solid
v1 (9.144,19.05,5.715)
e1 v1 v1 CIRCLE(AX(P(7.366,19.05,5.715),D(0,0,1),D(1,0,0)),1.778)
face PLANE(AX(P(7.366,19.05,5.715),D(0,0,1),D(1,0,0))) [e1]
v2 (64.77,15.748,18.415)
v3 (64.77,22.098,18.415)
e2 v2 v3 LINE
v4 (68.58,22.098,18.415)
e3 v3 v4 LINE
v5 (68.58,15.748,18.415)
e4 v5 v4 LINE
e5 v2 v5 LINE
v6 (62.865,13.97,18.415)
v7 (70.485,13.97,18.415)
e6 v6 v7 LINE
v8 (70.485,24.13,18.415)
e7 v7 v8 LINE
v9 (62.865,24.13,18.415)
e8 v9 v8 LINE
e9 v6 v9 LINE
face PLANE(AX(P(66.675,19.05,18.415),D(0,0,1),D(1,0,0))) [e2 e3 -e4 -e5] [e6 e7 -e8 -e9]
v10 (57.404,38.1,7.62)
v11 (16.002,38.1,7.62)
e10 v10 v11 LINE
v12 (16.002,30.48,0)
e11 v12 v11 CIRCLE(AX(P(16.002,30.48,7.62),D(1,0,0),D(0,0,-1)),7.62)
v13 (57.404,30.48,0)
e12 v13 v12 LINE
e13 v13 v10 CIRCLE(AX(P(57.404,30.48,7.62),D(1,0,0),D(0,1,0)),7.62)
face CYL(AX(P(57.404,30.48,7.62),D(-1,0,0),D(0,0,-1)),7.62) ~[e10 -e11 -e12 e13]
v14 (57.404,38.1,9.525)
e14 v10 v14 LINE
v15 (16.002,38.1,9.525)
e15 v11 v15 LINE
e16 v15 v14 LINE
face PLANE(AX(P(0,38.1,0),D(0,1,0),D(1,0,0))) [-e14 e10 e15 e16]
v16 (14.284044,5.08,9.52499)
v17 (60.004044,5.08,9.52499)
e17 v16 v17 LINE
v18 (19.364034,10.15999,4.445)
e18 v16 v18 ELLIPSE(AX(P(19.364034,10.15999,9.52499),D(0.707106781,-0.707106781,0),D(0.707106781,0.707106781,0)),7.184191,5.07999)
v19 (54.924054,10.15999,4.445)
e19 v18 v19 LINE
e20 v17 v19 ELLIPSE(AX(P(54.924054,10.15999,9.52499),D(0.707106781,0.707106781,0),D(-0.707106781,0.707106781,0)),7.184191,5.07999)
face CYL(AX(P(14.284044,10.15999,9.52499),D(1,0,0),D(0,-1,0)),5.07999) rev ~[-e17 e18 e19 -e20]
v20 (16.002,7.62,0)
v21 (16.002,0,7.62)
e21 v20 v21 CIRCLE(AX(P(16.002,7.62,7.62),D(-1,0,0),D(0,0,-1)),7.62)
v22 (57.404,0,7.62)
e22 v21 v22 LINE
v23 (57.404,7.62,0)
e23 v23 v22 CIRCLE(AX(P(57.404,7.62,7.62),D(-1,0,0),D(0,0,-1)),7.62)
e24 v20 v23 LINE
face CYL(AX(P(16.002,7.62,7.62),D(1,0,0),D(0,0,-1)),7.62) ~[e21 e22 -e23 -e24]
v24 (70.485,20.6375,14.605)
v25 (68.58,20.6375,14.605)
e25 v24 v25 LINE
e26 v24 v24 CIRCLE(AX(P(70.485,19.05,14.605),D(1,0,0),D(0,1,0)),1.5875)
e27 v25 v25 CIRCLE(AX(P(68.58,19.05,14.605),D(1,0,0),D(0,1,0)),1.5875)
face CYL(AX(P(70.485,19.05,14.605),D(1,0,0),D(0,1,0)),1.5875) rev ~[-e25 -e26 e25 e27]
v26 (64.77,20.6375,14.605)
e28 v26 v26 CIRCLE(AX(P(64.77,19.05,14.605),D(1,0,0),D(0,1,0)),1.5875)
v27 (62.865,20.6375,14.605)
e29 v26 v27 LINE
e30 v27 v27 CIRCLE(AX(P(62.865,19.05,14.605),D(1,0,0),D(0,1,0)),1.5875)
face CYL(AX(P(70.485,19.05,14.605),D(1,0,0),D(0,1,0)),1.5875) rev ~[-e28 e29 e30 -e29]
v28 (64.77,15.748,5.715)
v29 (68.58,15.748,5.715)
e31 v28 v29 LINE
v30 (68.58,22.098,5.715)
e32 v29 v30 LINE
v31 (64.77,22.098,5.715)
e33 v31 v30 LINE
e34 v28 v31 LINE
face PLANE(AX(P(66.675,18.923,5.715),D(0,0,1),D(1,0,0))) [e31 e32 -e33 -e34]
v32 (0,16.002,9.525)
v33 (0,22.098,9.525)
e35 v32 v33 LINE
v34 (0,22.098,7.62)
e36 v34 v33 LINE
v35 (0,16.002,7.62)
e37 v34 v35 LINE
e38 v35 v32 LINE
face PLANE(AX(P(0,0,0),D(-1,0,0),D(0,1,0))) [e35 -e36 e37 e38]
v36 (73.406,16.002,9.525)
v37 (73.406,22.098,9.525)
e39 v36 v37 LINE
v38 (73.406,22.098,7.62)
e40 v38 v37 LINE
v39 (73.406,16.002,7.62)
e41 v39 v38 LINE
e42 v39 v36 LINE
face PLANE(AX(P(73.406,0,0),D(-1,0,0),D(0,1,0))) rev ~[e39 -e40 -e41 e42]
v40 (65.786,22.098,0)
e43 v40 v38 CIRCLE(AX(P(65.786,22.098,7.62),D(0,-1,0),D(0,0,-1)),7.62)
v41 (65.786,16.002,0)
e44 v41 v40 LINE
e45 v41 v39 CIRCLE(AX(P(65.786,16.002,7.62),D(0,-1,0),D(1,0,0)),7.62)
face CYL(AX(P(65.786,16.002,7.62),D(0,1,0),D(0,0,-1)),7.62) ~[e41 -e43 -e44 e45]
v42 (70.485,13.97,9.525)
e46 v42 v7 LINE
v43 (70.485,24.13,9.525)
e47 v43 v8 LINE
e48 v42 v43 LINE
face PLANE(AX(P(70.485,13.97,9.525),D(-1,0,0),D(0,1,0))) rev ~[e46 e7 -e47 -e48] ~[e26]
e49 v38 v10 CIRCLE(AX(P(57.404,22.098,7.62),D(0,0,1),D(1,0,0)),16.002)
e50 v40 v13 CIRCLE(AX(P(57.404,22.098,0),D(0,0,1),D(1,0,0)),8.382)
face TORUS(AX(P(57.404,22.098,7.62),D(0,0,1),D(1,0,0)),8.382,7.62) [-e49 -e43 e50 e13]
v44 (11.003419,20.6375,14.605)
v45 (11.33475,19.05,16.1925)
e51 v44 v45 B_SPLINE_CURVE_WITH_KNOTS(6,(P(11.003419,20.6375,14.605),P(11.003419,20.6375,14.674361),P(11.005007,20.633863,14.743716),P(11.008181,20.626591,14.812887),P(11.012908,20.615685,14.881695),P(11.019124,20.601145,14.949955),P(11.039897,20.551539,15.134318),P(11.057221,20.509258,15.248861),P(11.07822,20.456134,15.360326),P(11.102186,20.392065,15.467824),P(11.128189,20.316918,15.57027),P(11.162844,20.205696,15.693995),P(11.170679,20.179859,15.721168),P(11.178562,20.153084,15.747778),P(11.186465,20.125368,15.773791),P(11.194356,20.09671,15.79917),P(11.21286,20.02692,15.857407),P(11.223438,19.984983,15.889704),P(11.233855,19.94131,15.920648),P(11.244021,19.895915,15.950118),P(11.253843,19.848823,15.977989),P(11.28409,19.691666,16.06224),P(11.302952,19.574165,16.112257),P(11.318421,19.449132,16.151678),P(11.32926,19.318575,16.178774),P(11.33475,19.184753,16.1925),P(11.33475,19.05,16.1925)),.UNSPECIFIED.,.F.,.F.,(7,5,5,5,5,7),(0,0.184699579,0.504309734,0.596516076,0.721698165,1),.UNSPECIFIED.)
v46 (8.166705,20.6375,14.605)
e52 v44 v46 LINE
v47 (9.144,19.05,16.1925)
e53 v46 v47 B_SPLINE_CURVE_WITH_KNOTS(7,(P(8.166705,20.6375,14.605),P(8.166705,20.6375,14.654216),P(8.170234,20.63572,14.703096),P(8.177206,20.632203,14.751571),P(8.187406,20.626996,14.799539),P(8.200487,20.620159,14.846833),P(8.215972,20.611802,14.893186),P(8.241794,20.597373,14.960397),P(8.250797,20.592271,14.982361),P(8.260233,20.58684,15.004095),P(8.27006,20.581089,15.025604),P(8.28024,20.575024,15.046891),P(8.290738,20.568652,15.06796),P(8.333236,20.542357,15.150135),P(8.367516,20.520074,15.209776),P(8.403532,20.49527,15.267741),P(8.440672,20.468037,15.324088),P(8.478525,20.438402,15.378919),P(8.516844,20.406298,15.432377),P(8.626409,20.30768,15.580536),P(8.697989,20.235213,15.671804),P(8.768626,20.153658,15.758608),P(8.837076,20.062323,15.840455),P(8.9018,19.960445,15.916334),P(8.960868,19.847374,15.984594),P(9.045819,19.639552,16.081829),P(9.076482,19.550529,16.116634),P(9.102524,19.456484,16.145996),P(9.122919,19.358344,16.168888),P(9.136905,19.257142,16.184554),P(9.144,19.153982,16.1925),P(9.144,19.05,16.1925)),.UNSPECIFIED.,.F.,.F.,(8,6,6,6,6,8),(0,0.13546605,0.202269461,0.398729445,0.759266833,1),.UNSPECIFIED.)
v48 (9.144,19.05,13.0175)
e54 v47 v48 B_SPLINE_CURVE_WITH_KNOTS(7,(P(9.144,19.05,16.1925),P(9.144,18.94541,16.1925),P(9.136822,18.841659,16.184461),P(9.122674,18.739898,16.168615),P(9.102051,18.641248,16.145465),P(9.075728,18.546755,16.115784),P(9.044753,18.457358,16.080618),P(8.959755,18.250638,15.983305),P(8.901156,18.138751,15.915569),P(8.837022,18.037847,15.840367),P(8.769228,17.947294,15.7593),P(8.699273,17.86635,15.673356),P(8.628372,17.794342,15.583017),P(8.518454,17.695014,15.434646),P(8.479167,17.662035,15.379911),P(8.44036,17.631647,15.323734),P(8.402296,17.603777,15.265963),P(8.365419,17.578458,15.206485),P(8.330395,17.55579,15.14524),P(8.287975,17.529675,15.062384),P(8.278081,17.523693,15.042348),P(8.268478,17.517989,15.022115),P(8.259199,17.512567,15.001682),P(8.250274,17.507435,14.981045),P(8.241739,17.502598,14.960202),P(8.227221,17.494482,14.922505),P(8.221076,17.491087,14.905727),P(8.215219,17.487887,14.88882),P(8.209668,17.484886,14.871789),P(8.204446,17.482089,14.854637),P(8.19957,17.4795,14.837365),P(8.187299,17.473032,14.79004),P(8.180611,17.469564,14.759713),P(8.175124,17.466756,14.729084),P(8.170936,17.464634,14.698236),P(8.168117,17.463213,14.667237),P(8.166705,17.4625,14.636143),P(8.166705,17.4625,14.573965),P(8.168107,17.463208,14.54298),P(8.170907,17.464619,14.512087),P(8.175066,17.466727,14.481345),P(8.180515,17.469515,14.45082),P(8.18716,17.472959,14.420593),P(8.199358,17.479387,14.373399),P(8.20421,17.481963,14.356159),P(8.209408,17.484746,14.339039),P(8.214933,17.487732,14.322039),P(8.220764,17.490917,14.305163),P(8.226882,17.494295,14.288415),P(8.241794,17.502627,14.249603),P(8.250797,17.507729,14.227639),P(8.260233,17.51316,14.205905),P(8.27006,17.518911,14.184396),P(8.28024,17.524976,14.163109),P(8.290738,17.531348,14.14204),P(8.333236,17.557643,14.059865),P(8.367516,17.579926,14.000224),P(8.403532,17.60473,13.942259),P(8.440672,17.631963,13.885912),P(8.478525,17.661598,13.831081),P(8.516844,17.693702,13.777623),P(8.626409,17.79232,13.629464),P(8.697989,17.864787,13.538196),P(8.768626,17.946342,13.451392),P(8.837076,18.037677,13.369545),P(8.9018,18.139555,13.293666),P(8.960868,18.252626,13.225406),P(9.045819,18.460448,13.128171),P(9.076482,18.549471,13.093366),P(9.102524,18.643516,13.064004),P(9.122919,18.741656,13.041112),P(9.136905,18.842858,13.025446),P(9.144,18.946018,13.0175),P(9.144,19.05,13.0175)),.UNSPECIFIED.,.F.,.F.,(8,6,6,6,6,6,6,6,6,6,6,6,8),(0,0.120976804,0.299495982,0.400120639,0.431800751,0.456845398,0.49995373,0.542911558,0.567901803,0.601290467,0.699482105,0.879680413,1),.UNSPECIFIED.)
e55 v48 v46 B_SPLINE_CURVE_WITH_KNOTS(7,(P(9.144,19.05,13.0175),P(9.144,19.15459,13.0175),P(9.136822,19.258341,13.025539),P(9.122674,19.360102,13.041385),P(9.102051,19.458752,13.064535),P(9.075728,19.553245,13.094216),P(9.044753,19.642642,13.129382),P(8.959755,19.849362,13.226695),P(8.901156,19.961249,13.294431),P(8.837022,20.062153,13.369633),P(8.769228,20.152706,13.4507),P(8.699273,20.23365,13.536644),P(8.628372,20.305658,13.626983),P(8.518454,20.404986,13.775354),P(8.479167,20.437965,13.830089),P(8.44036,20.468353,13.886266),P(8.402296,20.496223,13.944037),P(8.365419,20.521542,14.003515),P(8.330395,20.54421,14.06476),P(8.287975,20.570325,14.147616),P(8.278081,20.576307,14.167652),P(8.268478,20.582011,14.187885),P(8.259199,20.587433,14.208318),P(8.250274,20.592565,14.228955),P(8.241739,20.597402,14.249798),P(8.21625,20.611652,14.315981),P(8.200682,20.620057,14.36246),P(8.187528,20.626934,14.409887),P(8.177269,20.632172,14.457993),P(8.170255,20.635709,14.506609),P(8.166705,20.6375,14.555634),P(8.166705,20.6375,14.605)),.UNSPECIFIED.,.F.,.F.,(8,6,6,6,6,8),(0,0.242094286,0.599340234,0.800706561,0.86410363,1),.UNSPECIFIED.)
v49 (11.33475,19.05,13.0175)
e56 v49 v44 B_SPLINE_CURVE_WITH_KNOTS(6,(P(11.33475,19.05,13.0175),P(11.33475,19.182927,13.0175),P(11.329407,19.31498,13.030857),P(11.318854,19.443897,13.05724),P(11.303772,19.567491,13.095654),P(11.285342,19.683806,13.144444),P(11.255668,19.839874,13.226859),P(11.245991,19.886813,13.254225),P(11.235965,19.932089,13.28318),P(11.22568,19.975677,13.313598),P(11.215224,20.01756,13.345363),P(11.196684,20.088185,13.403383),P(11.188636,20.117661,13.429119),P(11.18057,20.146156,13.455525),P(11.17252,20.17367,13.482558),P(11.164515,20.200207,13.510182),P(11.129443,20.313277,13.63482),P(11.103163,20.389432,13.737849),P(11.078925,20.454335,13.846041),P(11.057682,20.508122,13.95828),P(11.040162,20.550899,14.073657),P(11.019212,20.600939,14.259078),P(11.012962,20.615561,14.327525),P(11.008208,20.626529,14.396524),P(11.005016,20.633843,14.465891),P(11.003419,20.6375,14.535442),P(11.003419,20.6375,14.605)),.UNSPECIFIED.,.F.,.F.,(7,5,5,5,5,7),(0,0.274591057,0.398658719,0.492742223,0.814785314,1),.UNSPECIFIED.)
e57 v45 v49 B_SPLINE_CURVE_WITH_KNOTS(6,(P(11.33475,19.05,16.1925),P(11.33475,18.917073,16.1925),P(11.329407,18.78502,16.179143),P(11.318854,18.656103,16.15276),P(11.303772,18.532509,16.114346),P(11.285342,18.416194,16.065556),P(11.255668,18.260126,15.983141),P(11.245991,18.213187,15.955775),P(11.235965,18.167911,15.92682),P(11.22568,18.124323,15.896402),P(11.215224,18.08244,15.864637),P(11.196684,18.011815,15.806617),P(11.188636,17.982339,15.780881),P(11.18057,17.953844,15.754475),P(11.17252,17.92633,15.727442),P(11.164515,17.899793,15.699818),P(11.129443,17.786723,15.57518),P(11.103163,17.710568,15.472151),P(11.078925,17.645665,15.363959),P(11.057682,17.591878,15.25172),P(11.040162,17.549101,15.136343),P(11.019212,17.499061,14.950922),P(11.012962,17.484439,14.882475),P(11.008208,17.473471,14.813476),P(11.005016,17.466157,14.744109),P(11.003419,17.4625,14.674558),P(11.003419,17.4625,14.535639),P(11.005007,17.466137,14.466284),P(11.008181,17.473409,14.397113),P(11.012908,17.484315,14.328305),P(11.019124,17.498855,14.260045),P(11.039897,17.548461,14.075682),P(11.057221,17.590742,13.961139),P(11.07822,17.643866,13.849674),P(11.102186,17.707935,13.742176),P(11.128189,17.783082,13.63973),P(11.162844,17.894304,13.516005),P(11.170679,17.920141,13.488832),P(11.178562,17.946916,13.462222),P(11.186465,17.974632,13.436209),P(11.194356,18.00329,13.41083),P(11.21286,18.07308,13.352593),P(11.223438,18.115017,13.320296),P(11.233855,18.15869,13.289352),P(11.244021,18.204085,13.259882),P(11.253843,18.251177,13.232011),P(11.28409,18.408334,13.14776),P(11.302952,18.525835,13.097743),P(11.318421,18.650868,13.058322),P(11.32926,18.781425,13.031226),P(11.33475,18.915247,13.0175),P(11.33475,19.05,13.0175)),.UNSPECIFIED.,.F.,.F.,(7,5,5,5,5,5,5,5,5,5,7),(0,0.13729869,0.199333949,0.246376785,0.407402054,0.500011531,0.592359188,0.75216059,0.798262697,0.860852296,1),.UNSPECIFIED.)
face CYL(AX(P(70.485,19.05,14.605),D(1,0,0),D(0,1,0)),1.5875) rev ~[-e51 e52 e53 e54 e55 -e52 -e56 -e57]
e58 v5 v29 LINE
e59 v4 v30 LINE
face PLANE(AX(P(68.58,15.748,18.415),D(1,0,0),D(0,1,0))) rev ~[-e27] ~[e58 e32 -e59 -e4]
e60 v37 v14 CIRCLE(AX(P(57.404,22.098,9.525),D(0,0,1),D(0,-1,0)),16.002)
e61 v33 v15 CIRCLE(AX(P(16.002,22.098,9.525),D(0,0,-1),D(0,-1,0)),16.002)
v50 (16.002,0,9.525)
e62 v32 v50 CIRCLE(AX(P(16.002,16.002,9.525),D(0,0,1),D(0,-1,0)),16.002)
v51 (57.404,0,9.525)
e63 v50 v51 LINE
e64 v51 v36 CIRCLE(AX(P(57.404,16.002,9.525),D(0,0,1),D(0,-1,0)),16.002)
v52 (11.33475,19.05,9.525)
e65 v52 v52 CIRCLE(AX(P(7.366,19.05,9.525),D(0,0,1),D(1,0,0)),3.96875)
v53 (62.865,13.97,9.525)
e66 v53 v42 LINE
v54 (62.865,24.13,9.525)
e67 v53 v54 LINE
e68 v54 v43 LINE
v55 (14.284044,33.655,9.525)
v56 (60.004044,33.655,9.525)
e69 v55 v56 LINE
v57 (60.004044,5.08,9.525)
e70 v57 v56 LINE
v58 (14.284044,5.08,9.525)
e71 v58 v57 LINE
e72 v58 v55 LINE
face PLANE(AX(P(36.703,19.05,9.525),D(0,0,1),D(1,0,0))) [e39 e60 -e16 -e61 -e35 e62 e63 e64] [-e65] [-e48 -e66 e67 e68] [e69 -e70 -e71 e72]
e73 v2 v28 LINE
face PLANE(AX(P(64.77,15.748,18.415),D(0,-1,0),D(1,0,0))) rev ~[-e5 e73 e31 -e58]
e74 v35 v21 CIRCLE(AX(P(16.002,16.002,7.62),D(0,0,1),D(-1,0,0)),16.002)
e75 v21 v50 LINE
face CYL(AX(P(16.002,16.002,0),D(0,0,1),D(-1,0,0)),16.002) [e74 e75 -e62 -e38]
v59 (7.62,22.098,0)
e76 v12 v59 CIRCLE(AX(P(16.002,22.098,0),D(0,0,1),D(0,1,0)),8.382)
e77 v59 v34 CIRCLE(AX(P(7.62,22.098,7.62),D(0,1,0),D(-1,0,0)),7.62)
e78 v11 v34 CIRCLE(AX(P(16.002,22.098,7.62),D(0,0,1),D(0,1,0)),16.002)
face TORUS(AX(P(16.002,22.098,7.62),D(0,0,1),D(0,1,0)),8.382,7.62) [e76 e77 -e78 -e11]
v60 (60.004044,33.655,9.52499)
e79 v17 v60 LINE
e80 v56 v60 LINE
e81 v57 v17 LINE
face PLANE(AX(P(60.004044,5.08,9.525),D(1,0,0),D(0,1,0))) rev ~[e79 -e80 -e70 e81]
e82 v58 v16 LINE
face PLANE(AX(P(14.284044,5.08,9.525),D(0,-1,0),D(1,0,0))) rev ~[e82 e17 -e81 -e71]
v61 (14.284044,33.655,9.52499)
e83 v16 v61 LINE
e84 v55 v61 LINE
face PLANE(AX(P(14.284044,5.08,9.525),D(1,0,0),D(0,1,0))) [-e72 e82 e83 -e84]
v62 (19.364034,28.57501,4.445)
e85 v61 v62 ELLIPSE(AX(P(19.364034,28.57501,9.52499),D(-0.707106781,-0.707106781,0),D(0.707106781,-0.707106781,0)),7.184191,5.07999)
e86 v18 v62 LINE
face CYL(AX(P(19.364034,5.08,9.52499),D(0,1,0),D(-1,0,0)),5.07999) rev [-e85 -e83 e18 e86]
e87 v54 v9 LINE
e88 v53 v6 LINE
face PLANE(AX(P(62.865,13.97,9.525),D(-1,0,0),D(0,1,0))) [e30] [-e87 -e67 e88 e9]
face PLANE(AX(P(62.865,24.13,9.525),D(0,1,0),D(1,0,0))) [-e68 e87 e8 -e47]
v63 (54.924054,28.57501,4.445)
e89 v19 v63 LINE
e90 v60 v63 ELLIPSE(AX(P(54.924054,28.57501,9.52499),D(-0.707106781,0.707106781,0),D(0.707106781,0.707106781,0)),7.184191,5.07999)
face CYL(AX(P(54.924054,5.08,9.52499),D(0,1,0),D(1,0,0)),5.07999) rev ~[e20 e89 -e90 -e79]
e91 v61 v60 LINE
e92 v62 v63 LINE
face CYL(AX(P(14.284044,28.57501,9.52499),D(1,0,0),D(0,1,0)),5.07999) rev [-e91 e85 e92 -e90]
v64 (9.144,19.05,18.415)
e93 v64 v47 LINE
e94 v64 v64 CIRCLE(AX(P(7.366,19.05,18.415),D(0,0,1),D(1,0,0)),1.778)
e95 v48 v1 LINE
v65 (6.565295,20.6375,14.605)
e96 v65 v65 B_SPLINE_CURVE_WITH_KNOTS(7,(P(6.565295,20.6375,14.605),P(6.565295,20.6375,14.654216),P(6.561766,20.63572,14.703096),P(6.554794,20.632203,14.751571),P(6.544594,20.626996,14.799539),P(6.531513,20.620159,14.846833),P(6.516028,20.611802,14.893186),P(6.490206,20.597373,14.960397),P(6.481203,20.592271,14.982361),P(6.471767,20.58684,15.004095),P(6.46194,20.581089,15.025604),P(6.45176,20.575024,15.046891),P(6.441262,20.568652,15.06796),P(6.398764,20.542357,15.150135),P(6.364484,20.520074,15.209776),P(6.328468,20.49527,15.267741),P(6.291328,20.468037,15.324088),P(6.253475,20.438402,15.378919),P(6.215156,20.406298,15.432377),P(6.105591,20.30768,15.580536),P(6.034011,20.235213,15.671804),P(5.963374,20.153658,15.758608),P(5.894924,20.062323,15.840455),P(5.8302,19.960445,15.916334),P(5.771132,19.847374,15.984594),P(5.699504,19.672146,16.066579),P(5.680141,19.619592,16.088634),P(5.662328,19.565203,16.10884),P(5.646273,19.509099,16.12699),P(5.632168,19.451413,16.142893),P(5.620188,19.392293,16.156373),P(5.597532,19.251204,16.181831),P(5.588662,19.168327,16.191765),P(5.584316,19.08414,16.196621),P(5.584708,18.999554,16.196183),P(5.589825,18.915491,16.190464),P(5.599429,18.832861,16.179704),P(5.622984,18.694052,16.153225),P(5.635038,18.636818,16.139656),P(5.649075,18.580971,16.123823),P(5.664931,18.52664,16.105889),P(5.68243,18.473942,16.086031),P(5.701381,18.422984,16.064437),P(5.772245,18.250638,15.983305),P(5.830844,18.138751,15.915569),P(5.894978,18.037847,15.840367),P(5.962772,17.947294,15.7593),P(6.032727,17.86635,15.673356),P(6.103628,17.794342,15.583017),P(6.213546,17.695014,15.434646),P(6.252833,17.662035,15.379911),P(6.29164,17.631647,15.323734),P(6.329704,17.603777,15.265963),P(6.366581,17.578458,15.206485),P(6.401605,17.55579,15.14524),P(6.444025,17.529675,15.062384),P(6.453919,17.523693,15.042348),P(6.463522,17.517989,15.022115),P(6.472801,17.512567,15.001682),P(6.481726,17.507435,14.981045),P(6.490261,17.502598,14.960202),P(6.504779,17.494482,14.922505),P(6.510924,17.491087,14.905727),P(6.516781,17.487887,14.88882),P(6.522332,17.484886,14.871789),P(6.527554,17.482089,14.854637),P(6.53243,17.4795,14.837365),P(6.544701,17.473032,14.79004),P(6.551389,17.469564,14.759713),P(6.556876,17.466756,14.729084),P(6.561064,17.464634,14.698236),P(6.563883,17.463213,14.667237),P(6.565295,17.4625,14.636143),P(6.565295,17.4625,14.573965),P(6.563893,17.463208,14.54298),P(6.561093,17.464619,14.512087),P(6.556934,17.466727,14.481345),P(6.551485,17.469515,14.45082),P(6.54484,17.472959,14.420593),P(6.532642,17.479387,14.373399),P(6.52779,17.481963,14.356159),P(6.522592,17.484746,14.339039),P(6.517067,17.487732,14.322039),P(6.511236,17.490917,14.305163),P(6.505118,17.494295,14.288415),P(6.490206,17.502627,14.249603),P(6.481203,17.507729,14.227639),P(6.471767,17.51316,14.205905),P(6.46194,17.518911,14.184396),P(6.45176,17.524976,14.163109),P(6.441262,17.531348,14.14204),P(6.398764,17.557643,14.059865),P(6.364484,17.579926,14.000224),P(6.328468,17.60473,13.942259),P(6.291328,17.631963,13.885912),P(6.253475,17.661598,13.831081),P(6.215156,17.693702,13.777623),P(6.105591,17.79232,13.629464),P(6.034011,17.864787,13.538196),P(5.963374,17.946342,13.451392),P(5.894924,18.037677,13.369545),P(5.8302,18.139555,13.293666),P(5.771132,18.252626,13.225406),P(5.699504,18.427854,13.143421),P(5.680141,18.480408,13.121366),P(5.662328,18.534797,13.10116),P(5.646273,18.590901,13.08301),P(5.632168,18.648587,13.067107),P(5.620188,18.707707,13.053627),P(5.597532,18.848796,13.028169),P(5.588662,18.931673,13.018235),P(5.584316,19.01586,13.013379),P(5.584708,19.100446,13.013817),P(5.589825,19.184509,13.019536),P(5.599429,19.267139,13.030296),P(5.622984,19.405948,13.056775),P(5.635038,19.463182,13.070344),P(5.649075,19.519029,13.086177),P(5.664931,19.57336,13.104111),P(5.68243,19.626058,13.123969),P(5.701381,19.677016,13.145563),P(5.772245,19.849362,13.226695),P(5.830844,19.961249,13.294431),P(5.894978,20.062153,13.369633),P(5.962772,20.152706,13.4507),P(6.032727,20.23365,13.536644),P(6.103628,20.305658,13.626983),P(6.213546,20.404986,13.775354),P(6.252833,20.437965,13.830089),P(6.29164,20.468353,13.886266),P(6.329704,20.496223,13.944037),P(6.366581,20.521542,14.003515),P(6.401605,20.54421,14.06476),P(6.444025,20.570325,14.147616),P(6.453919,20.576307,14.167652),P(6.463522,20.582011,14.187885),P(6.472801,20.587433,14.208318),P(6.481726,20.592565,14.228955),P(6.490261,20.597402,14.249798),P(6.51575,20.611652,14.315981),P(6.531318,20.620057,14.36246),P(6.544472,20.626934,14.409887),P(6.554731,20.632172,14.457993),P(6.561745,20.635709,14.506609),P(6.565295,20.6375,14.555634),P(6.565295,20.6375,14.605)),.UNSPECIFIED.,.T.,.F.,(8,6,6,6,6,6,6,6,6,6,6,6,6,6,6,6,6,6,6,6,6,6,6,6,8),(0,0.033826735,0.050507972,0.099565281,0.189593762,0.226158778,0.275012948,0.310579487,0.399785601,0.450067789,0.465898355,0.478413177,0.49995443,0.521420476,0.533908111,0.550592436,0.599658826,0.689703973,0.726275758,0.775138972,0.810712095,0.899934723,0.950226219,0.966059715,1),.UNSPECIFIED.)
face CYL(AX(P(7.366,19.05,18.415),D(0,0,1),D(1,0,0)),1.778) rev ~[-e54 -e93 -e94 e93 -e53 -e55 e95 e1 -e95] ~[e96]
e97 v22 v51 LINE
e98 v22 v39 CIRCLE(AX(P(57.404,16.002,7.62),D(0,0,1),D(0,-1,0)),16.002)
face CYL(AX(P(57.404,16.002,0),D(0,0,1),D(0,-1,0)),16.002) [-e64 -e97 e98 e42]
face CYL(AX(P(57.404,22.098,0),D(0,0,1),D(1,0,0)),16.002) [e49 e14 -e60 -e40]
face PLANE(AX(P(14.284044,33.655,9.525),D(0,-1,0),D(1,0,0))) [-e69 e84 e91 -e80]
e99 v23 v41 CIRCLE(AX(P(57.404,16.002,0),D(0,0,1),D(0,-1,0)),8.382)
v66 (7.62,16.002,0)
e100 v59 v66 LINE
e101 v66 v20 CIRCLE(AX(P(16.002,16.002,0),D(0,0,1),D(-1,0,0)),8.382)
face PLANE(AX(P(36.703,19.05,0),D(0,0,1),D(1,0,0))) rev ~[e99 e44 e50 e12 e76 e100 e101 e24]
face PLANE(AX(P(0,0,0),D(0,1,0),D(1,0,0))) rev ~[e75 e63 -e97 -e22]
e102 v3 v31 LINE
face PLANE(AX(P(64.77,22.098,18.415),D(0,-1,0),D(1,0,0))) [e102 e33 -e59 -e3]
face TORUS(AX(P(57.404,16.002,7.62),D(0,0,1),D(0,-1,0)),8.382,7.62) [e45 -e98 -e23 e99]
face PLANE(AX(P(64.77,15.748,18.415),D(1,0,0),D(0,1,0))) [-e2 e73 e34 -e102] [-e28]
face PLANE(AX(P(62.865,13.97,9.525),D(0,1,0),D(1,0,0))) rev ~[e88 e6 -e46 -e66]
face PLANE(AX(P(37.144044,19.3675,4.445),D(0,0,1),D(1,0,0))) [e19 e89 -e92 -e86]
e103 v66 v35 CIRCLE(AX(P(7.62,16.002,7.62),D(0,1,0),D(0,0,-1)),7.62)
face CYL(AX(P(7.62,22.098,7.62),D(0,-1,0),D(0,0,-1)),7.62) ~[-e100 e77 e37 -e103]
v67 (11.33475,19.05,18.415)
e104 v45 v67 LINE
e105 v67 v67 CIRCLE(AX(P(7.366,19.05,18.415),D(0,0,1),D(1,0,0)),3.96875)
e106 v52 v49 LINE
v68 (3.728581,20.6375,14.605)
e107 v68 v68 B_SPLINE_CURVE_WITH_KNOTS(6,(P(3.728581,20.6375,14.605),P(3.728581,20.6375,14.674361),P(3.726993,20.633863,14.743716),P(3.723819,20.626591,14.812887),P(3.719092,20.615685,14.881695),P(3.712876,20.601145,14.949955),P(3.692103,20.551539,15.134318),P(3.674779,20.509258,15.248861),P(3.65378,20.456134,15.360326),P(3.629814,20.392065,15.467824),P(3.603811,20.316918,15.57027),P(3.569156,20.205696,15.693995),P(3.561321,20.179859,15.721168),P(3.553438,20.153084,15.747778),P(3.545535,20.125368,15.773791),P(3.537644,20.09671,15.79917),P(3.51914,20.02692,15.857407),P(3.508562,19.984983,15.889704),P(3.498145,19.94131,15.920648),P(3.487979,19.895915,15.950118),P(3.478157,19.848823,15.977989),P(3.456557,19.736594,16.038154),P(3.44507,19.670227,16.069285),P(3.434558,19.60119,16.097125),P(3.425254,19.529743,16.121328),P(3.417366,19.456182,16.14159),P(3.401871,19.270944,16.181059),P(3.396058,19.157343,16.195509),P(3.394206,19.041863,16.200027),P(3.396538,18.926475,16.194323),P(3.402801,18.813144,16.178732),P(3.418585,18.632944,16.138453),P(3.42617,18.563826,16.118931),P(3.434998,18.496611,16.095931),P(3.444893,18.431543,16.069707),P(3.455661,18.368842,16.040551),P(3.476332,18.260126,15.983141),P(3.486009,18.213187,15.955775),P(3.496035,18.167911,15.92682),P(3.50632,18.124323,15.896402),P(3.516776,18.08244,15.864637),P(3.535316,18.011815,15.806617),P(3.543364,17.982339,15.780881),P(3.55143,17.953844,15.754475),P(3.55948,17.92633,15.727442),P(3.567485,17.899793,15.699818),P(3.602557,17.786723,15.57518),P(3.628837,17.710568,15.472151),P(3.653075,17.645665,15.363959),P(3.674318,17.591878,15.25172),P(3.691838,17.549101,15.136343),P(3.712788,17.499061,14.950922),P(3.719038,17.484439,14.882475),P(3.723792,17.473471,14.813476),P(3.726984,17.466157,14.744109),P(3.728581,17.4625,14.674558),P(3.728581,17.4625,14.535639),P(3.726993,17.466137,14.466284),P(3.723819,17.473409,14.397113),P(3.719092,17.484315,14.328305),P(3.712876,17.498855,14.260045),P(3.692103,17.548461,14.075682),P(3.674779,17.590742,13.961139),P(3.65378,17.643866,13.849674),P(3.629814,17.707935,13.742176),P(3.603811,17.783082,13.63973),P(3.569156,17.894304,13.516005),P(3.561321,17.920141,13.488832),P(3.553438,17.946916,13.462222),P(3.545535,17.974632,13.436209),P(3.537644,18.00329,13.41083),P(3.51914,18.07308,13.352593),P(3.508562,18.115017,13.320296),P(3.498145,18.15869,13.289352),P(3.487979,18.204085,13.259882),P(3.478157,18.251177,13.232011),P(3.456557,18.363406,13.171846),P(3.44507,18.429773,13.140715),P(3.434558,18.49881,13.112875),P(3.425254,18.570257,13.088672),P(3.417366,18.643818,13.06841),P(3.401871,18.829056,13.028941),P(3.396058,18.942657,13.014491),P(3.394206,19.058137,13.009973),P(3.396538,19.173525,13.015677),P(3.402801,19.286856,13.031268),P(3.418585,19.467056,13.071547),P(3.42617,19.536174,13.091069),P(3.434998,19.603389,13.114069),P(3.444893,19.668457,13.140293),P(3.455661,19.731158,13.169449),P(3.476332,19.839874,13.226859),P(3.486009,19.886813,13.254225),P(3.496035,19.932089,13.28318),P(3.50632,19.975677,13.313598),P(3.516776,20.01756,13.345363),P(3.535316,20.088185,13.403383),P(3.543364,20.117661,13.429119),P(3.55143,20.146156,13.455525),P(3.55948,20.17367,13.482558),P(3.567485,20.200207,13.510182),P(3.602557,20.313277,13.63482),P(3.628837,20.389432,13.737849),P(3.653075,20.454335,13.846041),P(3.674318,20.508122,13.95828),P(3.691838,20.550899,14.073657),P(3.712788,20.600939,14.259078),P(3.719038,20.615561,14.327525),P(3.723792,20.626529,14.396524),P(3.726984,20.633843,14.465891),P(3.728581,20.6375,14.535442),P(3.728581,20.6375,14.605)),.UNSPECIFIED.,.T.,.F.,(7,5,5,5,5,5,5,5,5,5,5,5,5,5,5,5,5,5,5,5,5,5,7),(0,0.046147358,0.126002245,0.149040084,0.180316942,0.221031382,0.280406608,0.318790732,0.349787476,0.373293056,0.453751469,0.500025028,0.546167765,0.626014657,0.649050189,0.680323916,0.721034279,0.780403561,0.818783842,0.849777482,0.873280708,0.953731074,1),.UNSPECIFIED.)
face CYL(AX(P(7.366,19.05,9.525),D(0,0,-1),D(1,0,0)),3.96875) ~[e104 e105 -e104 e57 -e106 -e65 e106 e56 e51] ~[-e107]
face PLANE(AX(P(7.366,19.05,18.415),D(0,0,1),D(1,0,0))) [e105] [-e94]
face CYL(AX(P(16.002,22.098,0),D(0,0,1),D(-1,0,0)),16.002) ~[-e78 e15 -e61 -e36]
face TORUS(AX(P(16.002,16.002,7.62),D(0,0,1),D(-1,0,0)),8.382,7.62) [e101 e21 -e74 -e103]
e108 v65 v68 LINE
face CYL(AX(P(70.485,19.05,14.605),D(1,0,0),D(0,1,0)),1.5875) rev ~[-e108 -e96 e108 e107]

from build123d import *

# Parameters (mm, degrees)
F0_W      = 73.406
F0_H      = 38.1
F1_DEPTH  = 9.525
F2_R      = 16.002
F3_R      = 3.96875
F3_W      = 7.62
F3_H      = 10.16
F4_DEPTH  = 8.89
F5_R      = 1.5875
F6_DEPTH  = 68.58
F7_R      = 1.778
F7_W      = 3.81
F7_H      = 6.35
F8_DEPTH  = 12.7
F9_R      = 7.62
F10_W     = 45.72
F10_H     = 28.575
F11_DEPTH = 5.08
F12_R     = 5.07999


# Not quite as in the source:
# - a fillet or chamfer is up to 0.001 mm smaller than in the source, because OpenCascade refuses the exact size


with BuildPart() as f1:
    # F0 (on Top) → F1 (new body)
    with BuildSketch(Plane.XY):
        with Locations((36.703, 19.05)):
            Rectangle(F0_W, F0_H)
    extrude(amount=F1_DEPTH)

    # F2
    f2_edges = [f1.edges().sort_by_distance(p)[0] for p in [
        (0, 38.1, 4.7625),
        (0, 0, 4.7625),
        (73.406, 38.1, 4.7625),
        (73.406, 0, 4.7625),
    ]]
    fillet(f2_edges, radius=F2_R)

    # F3 (on face) → F4 (join)
    with BuildSketch(Plane.XY.offset(9.525)):
        with Locations((7.366, 19.05)):
            Circle(F3_R)
        with Locations((66.675, 19.05)):
            Rectangle(F3_W, F3_H)
    extrude(amount=F4_DEPTH)

    # F5 (on face) → F6 (cut)
    with BuildSketch(Plane.YZ.offset(70.485)):
        with Locations((19.05, 14.605)):
            Circle(F5_R)
    extrude(amount=-F6_DEPTH, mode=Mode.SUBTRACT)

    # F7 (on face) → F8 (cut)
    with BuildSketch(Plane.XY.offset(18.415)):
        with Locations((7.366, 19.05)):
            Circle(F7_R)
        with Locations((66.675, 18.923)):
            Rectangle(F7_W, F7_H)
    extrude(amount=-F8_DEPTH, mode=Mode.SUBTRACT)

    # F9
    f9_edges = [f1.edges().sort_by_distance(p)[0] for p in [
        (36.703, 0, 0),
    ]]
    fillet(f9_edges, radius=F9_R)

    # F10 (on face) → F11 (cut)
    with BuildSketch(Plane.XY.offset(9.525)):
        with Locations((37.1440443242, 19.3675)):
            Rectangle(F10_W, F10_H)
    extrude(amount=-F11_DEPTH, mode=Mode.SUBTRACT)

    # F12 (radius 5.08 in the source; OpenCascade refuses exactly that, so slightly less here)
    f12_edges = [f1.edges().sort_by_distance(p)[0] for p in [
        (60.004044, 19.3675, 4.445),
        (37.144044, 33.655, 4.445),
        (14.284044, 19.3675, 4.445),
        (37.144044, 5.08, 4.445),
    ]]
    fillet(f12_edges, radius=F12_R)


solid = f1.part
